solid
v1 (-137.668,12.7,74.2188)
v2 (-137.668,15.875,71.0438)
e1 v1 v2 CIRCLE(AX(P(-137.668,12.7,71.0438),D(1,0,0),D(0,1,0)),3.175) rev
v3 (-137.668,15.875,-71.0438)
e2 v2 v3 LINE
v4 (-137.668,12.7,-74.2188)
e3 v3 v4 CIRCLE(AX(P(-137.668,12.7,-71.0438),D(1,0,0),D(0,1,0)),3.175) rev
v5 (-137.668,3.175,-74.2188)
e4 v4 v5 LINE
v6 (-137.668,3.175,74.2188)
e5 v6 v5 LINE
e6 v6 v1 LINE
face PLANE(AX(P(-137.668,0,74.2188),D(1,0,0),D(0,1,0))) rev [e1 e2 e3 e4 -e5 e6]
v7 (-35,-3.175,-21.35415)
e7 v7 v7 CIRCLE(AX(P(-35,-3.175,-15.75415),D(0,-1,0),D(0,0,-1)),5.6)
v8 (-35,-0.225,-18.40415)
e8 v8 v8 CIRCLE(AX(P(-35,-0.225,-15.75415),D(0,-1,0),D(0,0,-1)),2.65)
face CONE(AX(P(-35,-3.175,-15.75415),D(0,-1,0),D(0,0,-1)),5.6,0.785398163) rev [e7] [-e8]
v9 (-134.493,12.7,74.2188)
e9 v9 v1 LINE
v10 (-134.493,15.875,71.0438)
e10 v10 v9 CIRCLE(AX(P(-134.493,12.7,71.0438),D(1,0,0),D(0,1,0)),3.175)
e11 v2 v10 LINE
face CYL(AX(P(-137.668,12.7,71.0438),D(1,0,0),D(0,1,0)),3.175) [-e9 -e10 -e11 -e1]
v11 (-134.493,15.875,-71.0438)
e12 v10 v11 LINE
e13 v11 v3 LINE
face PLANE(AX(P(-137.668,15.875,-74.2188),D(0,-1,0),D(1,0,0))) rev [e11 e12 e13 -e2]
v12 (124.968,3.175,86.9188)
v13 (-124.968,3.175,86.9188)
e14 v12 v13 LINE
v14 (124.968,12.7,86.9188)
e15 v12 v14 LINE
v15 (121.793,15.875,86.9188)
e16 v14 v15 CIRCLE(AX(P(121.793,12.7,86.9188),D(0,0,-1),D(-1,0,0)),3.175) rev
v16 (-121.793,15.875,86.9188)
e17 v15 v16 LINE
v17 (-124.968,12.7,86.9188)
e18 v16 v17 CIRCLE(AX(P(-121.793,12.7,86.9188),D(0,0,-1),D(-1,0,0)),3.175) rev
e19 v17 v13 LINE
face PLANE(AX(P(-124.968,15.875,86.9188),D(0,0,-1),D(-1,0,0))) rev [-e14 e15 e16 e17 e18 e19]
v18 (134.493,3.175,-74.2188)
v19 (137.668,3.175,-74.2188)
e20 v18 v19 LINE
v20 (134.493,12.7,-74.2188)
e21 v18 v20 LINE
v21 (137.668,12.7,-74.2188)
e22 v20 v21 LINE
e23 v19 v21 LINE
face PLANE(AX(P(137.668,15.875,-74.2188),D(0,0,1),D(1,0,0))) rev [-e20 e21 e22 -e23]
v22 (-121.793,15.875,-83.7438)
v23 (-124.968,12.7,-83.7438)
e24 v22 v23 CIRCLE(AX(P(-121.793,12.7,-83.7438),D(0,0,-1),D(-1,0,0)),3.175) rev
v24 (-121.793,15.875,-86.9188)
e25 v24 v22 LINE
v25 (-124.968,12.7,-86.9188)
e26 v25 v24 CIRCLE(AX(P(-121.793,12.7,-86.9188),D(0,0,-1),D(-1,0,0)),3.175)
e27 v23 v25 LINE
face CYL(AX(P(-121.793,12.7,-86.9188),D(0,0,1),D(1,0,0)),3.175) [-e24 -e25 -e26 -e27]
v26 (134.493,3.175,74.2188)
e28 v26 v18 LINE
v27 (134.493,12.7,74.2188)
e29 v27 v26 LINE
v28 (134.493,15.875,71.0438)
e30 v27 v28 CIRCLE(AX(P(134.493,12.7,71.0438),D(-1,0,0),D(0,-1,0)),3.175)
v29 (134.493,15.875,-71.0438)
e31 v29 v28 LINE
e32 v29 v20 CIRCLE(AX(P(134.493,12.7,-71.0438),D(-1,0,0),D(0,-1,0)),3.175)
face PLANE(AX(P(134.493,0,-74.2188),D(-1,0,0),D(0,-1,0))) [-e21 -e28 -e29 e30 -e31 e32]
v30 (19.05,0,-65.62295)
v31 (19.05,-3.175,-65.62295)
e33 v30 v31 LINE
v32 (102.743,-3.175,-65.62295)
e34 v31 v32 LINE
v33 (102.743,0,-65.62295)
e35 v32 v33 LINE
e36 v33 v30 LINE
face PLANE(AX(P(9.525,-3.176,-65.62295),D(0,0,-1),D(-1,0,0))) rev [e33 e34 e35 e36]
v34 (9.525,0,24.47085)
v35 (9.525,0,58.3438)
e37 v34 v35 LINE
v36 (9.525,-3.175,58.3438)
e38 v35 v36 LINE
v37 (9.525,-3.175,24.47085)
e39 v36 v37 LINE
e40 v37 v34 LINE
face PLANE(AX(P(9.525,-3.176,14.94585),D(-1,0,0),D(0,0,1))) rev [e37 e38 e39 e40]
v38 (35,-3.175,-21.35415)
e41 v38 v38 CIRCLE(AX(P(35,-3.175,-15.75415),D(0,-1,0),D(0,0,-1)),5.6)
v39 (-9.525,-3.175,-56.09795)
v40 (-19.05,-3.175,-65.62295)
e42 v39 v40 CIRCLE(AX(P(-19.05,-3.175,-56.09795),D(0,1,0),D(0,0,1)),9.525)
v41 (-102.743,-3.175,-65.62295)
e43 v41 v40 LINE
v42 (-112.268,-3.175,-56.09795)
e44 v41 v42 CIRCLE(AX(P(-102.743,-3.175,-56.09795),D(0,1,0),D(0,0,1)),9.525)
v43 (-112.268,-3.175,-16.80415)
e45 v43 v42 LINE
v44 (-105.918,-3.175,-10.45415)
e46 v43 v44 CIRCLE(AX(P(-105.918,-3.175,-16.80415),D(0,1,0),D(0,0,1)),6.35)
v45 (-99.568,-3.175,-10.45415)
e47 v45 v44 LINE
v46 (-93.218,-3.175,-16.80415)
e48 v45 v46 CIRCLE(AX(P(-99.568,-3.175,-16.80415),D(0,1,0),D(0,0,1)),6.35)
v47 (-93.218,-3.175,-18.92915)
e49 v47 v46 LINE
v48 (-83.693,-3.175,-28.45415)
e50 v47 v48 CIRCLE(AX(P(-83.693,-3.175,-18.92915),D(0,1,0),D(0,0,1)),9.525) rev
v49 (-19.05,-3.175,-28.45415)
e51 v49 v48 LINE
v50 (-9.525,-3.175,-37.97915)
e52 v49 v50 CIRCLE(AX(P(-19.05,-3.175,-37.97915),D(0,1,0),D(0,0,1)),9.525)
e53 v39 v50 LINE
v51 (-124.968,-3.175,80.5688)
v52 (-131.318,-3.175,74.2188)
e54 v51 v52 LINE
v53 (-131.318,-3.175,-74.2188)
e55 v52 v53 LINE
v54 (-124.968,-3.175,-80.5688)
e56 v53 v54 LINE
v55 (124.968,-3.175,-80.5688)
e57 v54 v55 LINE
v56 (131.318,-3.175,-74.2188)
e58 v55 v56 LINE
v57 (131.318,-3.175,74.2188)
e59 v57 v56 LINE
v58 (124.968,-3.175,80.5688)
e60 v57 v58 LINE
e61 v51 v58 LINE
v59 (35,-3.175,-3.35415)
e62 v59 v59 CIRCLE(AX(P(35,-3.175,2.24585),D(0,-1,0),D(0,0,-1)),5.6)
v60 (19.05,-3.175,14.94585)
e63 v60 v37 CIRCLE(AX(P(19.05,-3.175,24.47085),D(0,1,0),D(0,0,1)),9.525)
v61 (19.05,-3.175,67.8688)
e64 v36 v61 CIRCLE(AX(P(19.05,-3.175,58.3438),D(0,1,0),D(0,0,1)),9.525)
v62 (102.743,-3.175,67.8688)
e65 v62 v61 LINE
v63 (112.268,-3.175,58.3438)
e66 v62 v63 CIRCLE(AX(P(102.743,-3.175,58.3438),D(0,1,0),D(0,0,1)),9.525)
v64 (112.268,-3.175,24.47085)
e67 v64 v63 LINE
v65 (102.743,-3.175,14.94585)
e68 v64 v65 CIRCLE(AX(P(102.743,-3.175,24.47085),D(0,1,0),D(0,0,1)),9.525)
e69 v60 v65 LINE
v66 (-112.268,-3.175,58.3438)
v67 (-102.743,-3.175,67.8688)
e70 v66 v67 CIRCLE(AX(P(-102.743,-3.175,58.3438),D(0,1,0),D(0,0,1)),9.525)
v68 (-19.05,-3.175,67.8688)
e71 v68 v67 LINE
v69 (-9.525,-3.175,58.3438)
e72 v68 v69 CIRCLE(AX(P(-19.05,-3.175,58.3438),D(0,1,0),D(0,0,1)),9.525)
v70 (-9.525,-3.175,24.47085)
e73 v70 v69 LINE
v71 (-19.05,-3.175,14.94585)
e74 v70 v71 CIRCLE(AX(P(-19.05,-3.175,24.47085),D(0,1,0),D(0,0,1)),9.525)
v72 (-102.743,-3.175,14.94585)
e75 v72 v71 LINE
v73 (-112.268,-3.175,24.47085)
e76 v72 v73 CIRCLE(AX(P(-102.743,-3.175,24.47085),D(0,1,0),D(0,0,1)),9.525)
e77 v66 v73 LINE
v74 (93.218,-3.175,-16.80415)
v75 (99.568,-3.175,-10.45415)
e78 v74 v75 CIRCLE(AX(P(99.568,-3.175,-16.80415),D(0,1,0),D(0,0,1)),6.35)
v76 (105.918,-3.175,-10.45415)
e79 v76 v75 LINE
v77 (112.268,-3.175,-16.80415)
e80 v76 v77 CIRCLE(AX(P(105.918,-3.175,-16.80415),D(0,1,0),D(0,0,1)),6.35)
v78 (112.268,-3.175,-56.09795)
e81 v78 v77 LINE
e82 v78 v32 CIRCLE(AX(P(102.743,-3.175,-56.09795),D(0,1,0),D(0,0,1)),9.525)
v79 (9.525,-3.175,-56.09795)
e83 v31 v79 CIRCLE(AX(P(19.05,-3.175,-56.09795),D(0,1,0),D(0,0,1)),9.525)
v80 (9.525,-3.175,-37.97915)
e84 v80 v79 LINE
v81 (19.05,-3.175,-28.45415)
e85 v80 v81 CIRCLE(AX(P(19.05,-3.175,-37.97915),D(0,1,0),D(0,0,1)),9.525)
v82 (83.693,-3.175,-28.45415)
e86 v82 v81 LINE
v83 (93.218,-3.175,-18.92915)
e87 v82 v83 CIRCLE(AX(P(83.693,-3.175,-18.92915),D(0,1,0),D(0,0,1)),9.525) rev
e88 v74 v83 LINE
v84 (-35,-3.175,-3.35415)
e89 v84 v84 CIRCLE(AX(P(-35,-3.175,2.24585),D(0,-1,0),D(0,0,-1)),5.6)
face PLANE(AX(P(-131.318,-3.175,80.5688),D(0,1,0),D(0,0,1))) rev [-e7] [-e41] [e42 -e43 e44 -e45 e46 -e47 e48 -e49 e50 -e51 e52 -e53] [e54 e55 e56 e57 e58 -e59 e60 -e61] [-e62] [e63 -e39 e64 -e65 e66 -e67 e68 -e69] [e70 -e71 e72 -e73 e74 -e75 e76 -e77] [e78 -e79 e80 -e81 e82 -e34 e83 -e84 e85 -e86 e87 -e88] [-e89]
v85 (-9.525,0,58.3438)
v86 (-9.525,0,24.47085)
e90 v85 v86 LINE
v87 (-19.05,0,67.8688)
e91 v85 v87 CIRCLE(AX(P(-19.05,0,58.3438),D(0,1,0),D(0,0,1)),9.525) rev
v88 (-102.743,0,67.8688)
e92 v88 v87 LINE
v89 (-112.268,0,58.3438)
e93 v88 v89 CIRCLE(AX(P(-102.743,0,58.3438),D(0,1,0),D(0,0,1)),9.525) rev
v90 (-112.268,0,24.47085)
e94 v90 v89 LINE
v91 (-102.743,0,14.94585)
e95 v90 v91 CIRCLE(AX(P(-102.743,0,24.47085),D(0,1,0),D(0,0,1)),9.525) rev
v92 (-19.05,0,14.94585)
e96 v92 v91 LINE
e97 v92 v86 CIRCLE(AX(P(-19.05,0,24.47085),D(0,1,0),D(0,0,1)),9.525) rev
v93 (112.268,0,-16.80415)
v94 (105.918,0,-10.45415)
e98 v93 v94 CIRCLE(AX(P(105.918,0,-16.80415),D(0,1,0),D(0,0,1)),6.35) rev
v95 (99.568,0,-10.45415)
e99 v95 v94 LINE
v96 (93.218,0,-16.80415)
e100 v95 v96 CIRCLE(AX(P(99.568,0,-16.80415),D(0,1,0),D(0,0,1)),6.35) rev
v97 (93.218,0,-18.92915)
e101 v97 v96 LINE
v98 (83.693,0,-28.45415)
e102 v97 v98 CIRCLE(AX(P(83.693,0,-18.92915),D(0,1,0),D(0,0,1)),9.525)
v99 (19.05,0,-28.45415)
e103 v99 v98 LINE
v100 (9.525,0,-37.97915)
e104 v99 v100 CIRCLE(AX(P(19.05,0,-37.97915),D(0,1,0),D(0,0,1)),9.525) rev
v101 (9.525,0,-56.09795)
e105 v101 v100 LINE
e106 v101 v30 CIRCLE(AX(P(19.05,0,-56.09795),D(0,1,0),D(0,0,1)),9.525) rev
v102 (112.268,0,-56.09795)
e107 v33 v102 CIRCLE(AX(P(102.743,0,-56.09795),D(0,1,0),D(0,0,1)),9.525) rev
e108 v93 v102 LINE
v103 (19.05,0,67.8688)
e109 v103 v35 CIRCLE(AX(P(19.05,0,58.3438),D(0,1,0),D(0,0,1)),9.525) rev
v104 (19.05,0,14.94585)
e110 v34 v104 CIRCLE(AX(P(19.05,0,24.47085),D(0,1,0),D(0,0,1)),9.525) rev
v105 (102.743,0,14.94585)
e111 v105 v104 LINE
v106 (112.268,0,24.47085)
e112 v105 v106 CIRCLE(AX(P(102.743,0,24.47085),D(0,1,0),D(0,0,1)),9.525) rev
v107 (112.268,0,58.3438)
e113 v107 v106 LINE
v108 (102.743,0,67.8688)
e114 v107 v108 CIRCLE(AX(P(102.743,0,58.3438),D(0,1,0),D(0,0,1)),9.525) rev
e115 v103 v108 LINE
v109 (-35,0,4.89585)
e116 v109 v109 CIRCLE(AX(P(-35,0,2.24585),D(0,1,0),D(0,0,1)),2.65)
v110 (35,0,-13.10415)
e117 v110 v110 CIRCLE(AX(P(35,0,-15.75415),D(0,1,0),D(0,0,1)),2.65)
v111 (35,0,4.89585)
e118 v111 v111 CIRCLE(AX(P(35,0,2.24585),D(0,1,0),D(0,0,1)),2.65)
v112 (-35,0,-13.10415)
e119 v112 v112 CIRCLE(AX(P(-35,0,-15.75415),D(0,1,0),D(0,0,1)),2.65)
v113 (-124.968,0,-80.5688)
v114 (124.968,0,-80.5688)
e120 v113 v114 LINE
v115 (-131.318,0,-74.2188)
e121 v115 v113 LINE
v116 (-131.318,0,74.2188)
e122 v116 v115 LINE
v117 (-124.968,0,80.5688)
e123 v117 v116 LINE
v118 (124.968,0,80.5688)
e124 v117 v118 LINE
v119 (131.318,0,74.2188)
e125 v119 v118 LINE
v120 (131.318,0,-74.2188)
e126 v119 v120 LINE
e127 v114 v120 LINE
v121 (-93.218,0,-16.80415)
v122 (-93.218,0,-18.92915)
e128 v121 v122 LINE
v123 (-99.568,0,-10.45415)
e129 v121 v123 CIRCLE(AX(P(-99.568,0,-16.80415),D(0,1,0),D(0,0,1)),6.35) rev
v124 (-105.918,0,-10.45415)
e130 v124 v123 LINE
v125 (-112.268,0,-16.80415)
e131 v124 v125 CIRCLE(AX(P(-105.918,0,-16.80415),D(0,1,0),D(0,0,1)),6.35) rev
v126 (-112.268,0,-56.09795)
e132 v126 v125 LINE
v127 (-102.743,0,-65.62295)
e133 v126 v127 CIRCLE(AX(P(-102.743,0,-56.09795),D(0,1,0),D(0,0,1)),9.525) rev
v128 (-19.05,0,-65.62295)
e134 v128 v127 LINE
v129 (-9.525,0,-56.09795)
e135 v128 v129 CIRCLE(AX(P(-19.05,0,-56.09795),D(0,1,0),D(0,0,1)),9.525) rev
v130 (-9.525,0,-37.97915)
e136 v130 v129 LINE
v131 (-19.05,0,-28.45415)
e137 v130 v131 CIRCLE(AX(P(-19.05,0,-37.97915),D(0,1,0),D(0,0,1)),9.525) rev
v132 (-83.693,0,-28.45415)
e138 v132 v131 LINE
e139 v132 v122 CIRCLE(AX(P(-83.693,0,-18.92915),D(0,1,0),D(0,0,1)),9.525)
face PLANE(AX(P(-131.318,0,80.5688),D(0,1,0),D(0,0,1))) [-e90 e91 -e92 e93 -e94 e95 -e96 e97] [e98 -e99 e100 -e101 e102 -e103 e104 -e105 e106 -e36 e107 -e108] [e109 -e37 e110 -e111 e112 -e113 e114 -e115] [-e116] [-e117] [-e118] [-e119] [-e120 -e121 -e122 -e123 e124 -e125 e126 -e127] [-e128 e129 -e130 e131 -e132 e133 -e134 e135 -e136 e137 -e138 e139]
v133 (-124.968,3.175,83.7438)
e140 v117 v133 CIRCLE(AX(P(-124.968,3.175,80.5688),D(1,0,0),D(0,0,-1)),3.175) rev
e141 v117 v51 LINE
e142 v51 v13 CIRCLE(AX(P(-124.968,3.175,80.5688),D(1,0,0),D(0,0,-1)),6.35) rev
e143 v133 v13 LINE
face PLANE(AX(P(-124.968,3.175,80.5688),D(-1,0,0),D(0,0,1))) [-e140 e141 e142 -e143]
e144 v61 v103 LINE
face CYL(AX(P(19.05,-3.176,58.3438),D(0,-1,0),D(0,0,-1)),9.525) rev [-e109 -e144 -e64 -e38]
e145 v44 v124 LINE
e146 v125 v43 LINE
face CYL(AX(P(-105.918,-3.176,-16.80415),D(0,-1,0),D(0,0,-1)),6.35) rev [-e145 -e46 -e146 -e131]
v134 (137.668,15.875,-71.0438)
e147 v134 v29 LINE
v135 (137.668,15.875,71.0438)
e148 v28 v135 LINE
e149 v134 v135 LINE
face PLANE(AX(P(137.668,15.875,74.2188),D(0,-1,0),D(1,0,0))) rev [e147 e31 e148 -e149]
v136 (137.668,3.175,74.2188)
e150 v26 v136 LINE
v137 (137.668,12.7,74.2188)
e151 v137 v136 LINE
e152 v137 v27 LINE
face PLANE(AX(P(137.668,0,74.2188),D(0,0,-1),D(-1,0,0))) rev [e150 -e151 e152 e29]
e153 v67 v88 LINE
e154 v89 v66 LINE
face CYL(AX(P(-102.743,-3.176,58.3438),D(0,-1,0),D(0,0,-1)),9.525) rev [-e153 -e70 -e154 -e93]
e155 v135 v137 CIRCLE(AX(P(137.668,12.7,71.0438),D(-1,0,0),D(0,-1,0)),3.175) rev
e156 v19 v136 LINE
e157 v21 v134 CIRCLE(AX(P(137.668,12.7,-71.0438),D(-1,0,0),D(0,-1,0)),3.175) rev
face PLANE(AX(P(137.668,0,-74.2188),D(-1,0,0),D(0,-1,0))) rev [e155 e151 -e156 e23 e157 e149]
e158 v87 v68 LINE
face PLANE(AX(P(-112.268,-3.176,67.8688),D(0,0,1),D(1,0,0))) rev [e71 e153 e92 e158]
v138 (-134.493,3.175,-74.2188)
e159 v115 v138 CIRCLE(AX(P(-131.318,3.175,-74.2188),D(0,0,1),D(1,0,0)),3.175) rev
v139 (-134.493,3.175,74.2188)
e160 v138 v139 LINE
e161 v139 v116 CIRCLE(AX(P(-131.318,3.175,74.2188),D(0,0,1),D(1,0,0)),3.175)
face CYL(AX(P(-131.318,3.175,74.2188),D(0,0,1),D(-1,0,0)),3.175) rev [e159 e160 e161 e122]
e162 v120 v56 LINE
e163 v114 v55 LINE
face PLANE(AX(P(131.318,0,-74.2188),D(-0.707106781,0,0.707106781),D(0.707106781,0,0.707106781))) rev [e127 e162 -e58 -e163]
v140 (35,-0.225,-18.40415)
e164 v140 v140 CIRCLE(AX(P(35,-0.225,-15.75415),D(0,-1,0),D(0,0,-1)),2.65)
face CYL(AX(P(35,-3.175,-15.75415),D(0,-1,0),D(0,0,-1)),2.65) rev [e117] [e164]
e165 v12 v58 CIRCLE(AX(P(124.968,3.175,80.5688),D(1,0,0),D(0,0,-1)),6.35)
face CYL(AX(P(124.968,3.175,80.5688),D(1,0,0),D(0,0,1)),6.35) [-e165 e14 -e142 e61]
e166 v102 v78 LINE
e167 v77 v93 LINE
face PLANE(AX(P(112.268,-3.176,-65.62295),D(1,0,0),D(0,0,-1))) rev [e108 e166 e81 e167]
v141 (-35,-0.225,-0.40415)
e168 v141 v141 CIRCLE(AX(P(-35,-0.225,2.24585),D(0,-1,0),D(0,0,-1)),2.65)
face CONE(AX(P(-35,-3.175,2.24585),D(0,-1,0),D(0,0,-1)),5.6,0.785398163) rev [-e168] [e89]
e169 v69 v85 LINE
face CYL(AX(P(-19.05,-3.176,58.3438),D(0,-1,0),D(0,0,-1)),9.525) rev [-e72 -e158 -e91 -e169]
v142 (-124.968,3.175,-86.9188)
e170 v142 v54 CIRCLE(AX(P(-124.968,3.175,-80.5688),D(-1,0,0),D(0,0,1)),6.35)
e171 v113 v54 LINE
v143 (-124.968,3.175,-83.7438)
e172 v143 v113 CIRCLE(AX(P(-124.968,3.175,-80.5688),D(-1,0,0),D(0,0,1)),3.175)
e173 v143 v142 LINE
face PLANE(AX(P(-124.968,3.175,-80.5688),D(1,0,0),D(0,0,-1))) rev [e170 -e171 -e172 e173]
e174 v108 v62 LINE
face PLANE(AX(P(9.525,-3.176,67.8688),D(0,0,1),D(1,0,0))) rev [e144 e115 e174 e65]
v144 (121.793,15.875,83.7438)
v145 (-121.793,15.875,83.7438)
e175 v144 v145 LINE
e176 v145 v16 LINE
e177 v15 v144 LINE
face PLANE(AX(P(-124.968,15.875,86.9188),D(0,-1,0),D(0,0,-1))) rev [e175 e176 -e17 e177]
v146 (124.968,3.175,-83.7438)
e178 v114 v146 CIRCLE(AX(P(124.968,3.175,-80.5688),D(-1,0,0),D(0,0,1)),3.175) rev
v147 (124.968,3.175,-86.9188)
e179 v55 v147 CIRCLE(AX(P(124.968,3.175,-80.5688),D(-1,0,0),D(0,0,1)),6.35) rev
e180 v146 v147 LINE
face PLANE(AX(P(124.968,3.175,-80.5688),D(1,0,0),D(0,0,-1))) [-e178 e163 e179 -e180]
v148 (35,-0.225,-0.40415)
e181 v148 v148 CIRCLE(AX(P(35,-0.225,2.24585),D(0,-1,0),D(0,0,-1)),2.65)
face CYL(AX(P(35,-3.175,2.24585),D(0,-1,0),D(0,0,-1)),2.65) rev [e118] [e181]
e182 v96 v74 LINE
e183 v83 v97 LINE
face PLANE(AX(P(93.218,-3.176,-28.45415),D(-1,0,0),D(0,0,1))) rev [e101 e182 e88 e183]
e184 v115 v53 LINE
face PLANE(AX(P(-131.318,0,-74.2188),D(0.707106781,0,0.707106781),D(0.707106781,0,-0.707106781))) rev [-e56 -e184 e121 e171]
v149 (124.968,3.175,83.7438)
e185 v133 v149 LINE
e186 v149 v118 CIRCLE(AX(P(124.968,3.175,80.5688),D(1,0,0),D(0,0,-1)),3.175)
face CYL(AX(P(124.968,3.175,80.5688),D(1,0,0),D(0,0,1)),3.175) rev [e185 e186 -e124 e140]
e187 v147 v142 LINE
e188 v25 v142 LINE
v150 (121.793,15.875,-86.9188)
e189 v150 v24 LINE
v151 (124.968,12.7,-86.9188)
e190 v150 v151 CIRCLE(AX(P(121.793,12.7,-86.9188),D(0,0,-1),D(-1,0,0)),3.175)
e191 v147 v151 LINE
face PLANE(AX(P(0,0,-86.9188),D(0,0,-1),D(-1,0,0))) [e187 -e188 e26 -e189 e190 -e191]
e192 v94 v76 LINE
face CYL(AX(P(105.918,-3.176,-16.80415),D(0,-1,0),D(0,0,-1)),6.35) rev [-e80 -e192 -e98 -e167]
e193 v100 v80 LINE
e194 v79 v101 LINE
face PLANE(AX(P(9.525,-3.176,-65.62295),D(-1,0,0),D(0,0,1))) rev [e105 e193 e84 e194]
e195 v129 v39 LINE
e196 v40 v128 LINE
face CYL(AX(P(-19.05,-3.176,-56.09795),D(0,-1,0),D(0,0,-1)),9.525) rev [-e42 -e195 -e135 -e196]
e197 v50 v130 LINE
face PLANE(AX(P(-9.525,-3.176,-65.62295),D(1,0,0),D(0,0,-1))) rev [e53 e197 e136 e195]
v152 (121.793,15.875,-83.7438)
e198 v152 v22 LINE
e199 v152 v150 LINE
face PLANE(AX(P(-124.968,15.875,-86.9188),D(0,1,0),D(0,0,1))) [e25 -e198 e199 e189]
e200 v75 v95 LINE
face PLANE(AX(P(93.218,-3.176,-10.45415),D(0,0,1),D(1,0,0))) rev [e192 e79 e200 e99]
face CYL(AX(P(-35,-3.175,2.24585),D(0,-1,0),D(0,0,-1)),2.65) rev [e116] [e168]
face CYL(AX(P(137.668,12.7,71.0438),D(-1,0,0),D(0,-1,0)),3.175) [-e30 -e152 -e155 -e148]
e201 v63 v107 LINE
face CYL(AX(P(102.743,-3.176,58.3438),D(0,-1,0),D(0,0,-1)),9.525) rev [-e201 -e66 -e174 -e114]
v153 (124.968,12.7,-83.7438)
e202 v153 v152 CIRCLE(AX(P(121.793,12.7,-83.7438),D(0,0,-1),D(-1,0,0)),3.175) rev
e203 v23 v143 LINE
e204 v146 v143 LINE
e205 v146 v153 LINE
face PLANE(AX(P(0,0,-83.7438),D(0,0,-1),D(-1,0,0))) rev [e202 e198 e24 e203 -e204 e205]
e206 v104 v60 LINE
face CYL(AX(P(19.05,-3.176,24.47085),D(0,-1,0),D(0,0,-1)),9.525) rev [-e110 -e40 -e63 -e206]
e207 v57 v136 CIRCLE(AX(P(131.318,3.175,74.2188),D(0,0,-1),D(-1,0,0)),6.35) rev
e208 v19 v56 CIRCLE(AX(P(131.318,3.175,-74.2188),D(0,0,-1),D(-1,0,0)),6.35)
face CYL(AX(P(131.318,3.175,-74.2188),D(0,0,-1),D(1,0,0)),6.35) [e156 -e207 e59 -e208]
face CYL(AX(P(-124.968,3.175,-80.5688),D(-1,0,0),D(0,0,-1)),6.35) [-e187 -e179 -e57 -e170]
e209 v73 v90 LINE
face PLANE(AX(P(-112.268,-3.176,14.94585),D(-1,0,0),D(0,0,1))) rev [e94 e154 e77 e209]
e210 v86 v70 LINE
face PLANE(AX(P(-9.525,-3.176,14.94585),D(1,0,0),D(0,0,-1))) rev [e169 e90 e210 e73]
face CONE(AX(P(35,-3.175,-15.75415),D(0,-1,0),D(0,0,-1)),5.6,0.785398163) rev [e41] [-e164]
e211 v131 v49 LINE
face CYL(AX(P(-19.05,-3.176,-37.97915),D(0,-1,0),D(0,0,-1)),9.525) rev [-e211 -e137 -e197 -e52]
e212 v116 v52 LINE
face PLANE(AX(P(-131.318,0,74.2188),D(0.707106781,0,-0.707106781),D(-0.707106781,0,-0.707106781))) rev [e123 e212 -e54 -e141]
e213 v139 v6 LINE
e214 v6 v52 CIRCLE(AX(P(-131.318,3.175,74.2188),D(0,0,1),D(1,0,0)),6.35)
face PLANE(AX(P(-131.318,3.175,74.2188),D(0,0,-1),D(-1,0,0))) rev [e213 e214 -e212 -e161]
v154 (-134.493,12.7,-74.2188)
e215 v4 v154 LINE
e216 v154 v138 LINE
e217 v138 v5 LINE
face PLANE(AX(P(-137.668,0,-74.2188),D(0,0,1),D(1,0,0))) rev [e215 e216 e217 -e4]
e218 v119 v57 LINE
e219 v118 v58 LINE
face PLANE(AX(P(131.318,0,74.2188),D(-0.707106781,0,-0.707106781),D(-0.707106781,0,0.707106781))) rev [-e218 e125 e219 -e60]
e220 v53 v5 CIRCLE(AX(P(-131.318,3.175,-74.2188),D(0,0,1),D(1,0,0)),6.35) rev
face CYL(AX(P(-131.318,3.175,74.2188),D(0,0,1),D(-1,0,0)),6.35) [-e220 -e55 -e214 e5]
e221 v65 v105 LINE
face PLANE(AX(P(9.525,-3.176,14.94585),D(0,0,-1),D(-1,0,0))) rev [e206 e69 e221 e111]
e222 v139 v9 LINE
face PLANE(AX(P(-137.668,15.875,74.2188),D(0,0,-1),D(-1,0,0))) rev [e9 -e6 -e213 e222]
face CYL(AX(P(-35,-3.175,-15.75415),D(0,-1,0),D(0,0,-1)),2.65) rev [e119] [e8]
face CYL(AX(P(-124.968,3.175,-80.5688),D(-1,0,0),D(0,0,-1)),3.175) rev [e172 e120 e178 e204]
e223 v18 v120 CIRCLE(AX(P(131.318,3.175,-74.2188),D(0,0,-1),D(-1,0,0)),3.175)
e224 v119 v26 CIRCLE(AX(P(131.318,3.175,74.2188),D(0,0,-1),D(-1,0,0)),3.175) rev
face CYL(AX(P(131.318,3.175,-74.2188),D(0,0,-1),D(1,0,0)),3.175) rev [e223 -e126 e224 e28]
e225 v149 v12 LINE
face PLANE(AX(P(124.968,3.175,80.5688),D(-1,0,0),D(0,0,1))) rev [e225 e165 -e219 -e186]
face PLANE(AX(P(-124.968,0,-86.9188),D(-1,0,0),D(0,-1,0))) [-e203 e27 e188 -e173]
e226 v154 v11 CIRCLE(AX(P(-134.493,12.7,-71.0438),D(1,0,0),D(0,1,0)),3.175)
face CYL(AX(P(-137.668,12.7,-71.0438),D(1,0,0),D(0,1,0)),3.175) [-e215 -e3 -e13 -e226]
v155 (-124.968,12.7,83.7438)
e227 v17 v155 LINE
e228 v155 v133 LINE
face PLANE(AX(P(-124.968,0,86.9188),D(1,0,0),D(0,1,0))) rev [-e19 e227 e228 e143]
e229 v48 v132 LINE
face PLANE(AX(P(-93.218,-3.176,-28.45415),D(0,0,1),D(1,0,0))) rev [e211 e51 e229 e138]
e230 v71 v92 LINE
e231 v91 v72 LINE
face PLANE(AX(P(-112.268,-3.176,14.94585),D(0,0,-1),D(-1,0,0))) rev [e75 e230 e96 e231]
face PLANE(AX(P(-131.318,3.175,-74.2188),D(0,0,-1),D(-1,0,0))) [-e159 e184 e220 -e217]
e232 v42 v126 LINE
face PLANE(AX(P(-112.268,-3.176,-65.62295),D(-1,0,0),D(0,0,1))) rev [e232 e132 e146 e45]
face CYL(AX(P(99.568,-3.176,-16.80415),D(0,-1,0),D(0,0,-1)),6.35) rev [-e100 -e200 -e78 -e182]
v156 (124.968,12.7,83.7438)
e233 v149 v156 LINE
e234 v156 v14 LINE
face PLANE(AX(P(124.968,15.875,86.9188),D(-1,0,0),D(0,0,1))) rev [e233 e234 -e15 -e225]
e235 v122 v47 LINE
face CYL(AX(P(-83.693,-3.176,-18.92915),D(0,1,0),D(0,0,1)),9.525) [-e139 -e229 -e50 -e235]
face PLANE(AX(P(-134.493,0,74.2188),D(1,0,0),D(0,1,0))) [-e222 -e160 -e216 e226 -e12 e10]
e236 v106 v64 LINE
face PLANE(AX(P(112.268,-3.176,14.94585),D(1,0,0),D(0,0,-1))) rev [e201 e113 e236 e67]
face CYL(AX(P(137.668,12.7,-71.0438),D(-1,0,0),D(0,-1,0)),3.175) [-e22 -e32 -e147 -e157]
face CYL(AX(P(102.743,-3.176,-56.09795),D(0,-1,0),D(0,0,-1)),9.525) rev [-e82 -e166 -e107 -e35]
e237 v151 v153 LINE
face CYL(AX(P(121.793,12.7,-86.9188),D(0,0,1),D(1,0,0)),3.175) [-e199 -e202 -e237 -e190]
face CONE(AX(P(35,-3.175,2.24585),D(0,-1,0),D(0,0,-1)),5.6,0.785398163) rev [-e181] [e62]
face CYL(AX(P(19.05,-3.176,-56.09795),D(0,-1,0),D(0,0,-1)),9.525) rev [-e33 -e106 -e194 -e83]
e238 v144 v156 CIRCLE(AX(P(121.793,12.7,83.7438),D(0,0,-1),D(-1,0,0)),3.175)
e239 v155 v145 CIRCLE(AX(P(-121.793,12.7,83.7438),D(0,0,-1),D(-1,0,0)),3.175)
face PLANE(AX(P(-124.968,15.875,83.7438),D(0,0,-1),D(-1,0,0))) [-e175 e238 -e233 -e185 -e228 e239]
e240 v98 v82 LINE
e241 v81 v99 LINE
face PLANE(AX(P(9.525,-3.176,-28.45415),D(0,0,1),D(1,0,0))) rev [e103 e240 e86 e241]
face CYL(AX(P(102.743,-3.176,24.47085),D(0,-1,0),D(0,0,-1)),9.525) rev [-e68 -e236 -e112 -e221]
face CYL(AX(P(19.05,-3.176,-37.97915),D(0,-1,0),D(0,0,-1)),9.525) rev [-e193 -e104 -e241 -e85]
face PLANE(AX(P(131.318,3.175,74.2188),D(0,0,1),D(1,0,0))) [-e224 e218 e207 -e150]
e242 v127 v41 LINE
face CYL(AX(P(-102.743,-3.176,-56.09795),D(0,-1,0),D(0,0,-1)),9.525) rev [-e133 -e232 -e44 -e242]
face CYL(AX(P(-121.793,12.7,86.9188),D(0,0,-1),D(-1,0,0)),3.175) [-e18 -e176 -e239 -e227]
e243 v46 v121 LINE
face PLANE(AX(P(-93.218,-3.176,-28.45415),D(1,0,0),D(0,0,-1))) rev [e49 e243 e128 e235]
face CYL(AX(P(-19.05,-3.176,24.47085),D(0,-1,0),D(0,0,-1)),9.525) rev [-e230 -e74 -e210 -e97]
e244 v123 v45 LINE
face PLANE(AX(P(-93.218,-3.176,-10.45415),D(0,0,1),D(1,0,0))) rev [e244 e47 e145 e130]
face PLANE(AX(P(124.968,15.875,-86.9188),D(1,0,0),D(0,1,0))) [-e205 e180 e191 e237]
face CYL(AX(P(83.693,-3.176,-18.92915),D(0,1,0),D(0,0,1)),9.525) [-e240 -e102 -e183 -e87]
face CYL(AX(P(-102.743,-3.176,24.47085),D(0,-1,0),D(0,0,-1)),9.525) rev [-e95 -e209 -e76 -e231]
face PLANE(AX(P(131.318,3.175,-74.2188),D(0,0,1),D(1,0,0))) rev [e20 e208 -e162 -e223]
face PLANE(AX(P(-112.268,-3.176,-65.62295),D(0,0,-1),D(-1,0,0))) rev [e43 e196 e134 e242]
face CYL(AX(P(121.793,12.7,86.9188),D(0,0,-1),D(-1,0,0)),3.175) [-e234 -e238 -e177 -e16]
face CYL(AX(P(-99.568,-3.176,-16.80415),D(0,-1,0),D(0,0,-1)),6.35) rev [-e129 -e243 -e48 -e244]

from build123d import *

# Parameters (mm, degrees)
SKETCH1_W                     = 262.636
SKETCH1_H                     = 3.175
BASE_FLANGE1_DEPTH            = 80.5688
CUT_EXTRUDE1_DEPTH            = 155.096817886
EDGE_FLANGE2_DEPTH            = 148.4376
EDGE_FLANGE3_DEPTH            = 249.936
EDGE_FLANGE4_DEPTH            = 148.4376
EDGE_FLANGE5_DEPTH            = 249.936
CSK_FOR_M5_SFHCS1_D           = 5.3
CSK_FOR_M5_SFHCS1_CSINK_D     = 11.2
CSK_FOR_M5_SFHCS1_CSINK_ANGLE = 90
CUT_EXTRUDE3_REACH            = 165.583
SKETCH18_W                    = 102.743
SKETCH18_H                    = 52.92295
FILLET2_R                     = 9.525
FILLET3_R                     = 6.35
FILLET4_R                     = 3.175


# Sheet-metal steps are written as plain solids
with BuildPart() as part:
    # Sketch1 → Base-Flange1 (new, symmetric)
    with BuildSketch(Plane.XY):
        with Locations((0, -1.5875)):
            Rectangle(SKETCH1_W, SKETCH1_H)
    extrude(amount=BASE_FLANGE1_DEPTH, both=True)

    # Sketch2 → Cut-Extrude1 (cut, through all)
    with BuildSketch(Plane(origin=(0, 0, 0), x_dir=(-1, 0, 0), z_dir=(0, 1, 0))):
        Polygon((131.318, -80.5688), (131.318, -74.2188), (124.968, -80.5688), align=None)
        Polygon((131.318, 74.2188), (124.968, 80.5688), (131.318, 80.5688), align=None)
        Polygon((-131.318, 80.5688), (-124.968, 80.5688), (-131.318, 74.2188), align=None)
        Polygon((-124.968, -80.5688), (-131.318, -80.5688), (-131.318, -74.2188), align=None)
    extrude(amount=-CUT_EXTRUDE1_DEPTH, mode=Mode.SUBTRACT)

    # Edge-Flange2 section (across the edge) → Edge-Flange2 (add)
    with BuildSketch(Plane(origin=(134.493, 0, 74.2188), x_dir=(-1, 0, 0), z_dir=(0, 0, -1))):
        with BuildLine():
            Line((-3.175, 3.175), (-3.175, 15.875))
            Line((-3.175, 15.875), (0, 15.875))
            Line((0, 15.875), (0, 3.175))
            ThreePointArc((0, 3.175), (0.92993597, 0.92993597), (3.175, 0))
            Line((3.175, 0), (3.175, -3.175))
            ThreePointArc((3.175, -3.175), (-1.315128061, -1.315128061), (-3.175, 3.175))
        make_face()
    extrude(amount=EDGE_FLANGE2_DEPTH)

    # Edge-Flange3 section (across the edge) → Edge-Flange3 (add)
    with BuildSketch(Plane(origin=(-124.968, 0, 83.7438), x_dir=(0, 0, -1), z_dir=(1, 0, 0))):
        with BuildLine():
            Line((-3.175, 3.175), (-3.175, 15.875))
            Line((-3.175, 15.875), (0, 15.875))
            Line((0, 15.875), (0, 3.175))
            ThreePointArc((0, 3.175), (0.92993597, 0.92993597), (3.175, 0))
            Line((3.175, 0), (3.175, -3.175))
            ThreePointArc((3.175, -3.175), (-1.315128061, -1.315128061), (-3.175, 3.175))
        make_face()
    extrude(amount=EDGE_FLANGE3_DEPTH)

    # Edge-Flange4 section (across the edge) → Edge-Flange4 (add)
    with BuildSketch(Plane(origin=(-134.493, 0, -74.2188), x_dir=(1, 0, 0), z_dir=(0, 0, 1))):
        with BuildLine():
            Line((-3.175, 3.175), (-3.175, 15.875))
            Line((-3.175, 15.875), (0, 15.875))
            Line((0, 15.875), (0, 3.175))
            ThreePointArc((0, 3.175), (0.92993597, 0.92993597), (3.175, 0))
            Line((3.175, 0), (3.175, -3.175))
            ThreePointArc((3.175, -3.175), (-1.315128061, -1.315128061), (-3.175, 3.175))
        make_face()
    extrude(amount=EDGE_FLANGE4_DEPTH)

    # Edge-Flange5 section (across the edge) → Edge-Flange5 (add)
    with BuildSketch(Plane(origin=(124.968, 0, -83.7438), x_dir=(0, 0, 1), z_dir=(-1, 0, 0))):
        with BuildLine():
            Line((-3.175, 3.175), (-3.175, 15.875))
            Line((-3.175, 15.875), (0, 15.875))
            Line((0, 15.875), (0, 3.175))
            ThreePointArc((0, 3.175), (0.92993597, 0.92993597), (3.175, 0))
            Line((3.175, 0), (3.175, -3.175))
            ThreePointArc((3.175, -3.175), (-1.315128061, -1.315128061), (-3.175, 3.175))
        make_face()
    extrude(amount=EDGE_FLANGE5_DEPTH)

    # CSK for M5 SFHCS1 (through all)
    with Locations(Plane.XZ.offset(3.175)):
        with Locations((-35, -15.75415), (35, -15.75415), (35, 2.24585), (-35, 2.24585)):
            CounterSinkHole(CSK_FOR_M5_SFHCS1_D / 2, CSK_FOR_M5_SFHCS1_CSINK_D / 2, counter_sink_angle=CSK_FOR_M5_SFHCS1_CSINK_ANGLE)

    # Sketch18 → Cut-Extrude3 (cut, up to next)
    with BuildSketch(Plane(origin=(0, 0, 0), x_dir=(1, 0, 0), z_dir=(0, 1, 0)), mode=Mode.PRIVATE) as cut_extrude3_sk1:
        with Locations((-60.8965, -41.407325)):
            Rectangle(SKETCH18_W, SKETCH18_H)
    cut_extrude3_tool1 = extrude(cut_extrude3_sk1.sketch, amount=-CUT_EXTRUDE3_REACH, mode=Mode.PRIVATE) & part.part
    # Sketch18 → Cut-Extrude3 (cut, up to next)
    with BuildSketch(Plane(origin=(0, 0, 0), x_dir=(1, 0, 0), z_dir=(0, 1, 0)), mode=Mode.PRIVATE) as cut_extrude3_sk2:
        with Locations((60.8965, -41.407325)):
            Rectangle(SKETCH18_W, SKETCH18_H)
    cut_extrude3_tool2 = extrude(cut_extrude3_sk2.sketch, amount=-CUT_EXTRUDE3_REACH, mode=Mode.PRIVATE) & part.part
    # Sketch18 → Cut-Extrude3 (cut, up to next)
    with BuildSketch(Plane(origin=(0, 0, 0), x_dir=(1, 0, 0), z_dir=(0, 1, 0)), mode=Mode.PRIVATE) as cut_extrude3_sk3:
        Polygon((-93.218, 28.45415), (-93.218, 10.45415), (-112.268, 10.45415), (-112.268, 65.62295), (-9.525, 65.62295), (-9.525, 28.45415), align=None)
    cut_extrude3_tool3 = extrude(cut_extrude3_sk3.sketch, amount=-CUT_EXTRUDE3_REACH, mode=Mode.PRIVATE) & part.part
    # Sketch18 → Cut-Extrude3 (cut, up to next)
    with BuildSketch(Plane(origin=(0, 0, 0), x_dir=(1, 0, 0), z_dir=(0, 1, 0)), mode=Mode.PRIVATE) as cut_extrude3_sk4:
        Polygon((9.525, 65.62295), (112.268, 65.62295), (112.268, 10.45415), (93.218, 10.45415), (93.218, 28.45415), (9.525, 28.45415), align=None)
    cut_extrude3_tool4 = extrude(cut_extrude3_sk4.sketch, amount=-CUT_EXTRUDE3_REACH, mode=Mode.PRIVATE) & part.part
    add(cut_extrude3_tool1.solids().sort_by_distance((-60.8965, 0, 41.407325))[0], mode=Mode.SUBTRACT)
    add(cut_extrude3_tool2.solids().sort_by_distance((60.8965, 0, 41.407325))[0], mode=Mode.SUBTRACT)
    add(cut_extrude3_tool3.solids().sort_by_distance((-64.344381, 0, -44.765774))[0], mode=Mode.SUBTRACT)
    add(cut_extrude3_tool4.solids().sort_by_distance((64.344381, 0, -44.765774))[0], mode=Mode.SUBTRACT)

    # Fillet2
    fillet2_edges = [part.edges().sort_by_distance(p)[0] for p in [
        (112.268, -1.5875, 14.94585),
        (112.268, -1.5875, 67.8688),
        (9.525, -1.5875, 67.8688),
        (9.525, -1.5875, 14.94585),
        (-112.268, -1.5875, -65.62295),
        (-9.525, -1.5875, -65.62295),
        (-9.525, -1.5875, -28.45415),
        (-93.218, -1.5875, -28.45415),
        (9.525, -1.5875, -28.45415),
        (9.525, -1.5875, -65.62295),
        (112.268, -1.5875, -65.62295),
        (93.218, -1.5875, -28.45415),
        (-9.525, -1.5875, 14.94585),
        (-9.525, -1.5875, 67.8688),
        (-112.268, -1.5875, 67.8688),
        (-112.268, -1.5875, 14.94585),
    ]]
    fillet(fillet2_edges, radius=FILLET2_R)

    # Fillet3
    fillet3_edges = [part.edges().sort_by_distance(p)[0] for p in [
        (-112.268, -1.5875, -10.45415),
        (-93.218, -1.5875, -10.45415),
        (112.268, -1.5875, -10.45415),
        (93.218, -1.5875, -10.45415),
    ]]
    fillet(fillet3_edges, radius=FILLET3_R)

    # Fillet4
    fillet4_edges = [part.edges().sort_by_distance(p)[0] for p in [
        (-136.0805, 15.875, -74.2188),
        (-136.0805, 15.875, 74.2188),
        (124.968, 15.875, -85.3313),
        (-124.968, 15.875, -85.3313),
        (136.0805, 15.875, 74.2188),
        (136.0805, 15.875, -74.2188),
        (-124.968, 15.875, 85.3313),
        (124.968, 15.875, 85.3313),
    ]]
    fillet(fillet4_edges, radius=FILLET4_R)


solid = part.part
